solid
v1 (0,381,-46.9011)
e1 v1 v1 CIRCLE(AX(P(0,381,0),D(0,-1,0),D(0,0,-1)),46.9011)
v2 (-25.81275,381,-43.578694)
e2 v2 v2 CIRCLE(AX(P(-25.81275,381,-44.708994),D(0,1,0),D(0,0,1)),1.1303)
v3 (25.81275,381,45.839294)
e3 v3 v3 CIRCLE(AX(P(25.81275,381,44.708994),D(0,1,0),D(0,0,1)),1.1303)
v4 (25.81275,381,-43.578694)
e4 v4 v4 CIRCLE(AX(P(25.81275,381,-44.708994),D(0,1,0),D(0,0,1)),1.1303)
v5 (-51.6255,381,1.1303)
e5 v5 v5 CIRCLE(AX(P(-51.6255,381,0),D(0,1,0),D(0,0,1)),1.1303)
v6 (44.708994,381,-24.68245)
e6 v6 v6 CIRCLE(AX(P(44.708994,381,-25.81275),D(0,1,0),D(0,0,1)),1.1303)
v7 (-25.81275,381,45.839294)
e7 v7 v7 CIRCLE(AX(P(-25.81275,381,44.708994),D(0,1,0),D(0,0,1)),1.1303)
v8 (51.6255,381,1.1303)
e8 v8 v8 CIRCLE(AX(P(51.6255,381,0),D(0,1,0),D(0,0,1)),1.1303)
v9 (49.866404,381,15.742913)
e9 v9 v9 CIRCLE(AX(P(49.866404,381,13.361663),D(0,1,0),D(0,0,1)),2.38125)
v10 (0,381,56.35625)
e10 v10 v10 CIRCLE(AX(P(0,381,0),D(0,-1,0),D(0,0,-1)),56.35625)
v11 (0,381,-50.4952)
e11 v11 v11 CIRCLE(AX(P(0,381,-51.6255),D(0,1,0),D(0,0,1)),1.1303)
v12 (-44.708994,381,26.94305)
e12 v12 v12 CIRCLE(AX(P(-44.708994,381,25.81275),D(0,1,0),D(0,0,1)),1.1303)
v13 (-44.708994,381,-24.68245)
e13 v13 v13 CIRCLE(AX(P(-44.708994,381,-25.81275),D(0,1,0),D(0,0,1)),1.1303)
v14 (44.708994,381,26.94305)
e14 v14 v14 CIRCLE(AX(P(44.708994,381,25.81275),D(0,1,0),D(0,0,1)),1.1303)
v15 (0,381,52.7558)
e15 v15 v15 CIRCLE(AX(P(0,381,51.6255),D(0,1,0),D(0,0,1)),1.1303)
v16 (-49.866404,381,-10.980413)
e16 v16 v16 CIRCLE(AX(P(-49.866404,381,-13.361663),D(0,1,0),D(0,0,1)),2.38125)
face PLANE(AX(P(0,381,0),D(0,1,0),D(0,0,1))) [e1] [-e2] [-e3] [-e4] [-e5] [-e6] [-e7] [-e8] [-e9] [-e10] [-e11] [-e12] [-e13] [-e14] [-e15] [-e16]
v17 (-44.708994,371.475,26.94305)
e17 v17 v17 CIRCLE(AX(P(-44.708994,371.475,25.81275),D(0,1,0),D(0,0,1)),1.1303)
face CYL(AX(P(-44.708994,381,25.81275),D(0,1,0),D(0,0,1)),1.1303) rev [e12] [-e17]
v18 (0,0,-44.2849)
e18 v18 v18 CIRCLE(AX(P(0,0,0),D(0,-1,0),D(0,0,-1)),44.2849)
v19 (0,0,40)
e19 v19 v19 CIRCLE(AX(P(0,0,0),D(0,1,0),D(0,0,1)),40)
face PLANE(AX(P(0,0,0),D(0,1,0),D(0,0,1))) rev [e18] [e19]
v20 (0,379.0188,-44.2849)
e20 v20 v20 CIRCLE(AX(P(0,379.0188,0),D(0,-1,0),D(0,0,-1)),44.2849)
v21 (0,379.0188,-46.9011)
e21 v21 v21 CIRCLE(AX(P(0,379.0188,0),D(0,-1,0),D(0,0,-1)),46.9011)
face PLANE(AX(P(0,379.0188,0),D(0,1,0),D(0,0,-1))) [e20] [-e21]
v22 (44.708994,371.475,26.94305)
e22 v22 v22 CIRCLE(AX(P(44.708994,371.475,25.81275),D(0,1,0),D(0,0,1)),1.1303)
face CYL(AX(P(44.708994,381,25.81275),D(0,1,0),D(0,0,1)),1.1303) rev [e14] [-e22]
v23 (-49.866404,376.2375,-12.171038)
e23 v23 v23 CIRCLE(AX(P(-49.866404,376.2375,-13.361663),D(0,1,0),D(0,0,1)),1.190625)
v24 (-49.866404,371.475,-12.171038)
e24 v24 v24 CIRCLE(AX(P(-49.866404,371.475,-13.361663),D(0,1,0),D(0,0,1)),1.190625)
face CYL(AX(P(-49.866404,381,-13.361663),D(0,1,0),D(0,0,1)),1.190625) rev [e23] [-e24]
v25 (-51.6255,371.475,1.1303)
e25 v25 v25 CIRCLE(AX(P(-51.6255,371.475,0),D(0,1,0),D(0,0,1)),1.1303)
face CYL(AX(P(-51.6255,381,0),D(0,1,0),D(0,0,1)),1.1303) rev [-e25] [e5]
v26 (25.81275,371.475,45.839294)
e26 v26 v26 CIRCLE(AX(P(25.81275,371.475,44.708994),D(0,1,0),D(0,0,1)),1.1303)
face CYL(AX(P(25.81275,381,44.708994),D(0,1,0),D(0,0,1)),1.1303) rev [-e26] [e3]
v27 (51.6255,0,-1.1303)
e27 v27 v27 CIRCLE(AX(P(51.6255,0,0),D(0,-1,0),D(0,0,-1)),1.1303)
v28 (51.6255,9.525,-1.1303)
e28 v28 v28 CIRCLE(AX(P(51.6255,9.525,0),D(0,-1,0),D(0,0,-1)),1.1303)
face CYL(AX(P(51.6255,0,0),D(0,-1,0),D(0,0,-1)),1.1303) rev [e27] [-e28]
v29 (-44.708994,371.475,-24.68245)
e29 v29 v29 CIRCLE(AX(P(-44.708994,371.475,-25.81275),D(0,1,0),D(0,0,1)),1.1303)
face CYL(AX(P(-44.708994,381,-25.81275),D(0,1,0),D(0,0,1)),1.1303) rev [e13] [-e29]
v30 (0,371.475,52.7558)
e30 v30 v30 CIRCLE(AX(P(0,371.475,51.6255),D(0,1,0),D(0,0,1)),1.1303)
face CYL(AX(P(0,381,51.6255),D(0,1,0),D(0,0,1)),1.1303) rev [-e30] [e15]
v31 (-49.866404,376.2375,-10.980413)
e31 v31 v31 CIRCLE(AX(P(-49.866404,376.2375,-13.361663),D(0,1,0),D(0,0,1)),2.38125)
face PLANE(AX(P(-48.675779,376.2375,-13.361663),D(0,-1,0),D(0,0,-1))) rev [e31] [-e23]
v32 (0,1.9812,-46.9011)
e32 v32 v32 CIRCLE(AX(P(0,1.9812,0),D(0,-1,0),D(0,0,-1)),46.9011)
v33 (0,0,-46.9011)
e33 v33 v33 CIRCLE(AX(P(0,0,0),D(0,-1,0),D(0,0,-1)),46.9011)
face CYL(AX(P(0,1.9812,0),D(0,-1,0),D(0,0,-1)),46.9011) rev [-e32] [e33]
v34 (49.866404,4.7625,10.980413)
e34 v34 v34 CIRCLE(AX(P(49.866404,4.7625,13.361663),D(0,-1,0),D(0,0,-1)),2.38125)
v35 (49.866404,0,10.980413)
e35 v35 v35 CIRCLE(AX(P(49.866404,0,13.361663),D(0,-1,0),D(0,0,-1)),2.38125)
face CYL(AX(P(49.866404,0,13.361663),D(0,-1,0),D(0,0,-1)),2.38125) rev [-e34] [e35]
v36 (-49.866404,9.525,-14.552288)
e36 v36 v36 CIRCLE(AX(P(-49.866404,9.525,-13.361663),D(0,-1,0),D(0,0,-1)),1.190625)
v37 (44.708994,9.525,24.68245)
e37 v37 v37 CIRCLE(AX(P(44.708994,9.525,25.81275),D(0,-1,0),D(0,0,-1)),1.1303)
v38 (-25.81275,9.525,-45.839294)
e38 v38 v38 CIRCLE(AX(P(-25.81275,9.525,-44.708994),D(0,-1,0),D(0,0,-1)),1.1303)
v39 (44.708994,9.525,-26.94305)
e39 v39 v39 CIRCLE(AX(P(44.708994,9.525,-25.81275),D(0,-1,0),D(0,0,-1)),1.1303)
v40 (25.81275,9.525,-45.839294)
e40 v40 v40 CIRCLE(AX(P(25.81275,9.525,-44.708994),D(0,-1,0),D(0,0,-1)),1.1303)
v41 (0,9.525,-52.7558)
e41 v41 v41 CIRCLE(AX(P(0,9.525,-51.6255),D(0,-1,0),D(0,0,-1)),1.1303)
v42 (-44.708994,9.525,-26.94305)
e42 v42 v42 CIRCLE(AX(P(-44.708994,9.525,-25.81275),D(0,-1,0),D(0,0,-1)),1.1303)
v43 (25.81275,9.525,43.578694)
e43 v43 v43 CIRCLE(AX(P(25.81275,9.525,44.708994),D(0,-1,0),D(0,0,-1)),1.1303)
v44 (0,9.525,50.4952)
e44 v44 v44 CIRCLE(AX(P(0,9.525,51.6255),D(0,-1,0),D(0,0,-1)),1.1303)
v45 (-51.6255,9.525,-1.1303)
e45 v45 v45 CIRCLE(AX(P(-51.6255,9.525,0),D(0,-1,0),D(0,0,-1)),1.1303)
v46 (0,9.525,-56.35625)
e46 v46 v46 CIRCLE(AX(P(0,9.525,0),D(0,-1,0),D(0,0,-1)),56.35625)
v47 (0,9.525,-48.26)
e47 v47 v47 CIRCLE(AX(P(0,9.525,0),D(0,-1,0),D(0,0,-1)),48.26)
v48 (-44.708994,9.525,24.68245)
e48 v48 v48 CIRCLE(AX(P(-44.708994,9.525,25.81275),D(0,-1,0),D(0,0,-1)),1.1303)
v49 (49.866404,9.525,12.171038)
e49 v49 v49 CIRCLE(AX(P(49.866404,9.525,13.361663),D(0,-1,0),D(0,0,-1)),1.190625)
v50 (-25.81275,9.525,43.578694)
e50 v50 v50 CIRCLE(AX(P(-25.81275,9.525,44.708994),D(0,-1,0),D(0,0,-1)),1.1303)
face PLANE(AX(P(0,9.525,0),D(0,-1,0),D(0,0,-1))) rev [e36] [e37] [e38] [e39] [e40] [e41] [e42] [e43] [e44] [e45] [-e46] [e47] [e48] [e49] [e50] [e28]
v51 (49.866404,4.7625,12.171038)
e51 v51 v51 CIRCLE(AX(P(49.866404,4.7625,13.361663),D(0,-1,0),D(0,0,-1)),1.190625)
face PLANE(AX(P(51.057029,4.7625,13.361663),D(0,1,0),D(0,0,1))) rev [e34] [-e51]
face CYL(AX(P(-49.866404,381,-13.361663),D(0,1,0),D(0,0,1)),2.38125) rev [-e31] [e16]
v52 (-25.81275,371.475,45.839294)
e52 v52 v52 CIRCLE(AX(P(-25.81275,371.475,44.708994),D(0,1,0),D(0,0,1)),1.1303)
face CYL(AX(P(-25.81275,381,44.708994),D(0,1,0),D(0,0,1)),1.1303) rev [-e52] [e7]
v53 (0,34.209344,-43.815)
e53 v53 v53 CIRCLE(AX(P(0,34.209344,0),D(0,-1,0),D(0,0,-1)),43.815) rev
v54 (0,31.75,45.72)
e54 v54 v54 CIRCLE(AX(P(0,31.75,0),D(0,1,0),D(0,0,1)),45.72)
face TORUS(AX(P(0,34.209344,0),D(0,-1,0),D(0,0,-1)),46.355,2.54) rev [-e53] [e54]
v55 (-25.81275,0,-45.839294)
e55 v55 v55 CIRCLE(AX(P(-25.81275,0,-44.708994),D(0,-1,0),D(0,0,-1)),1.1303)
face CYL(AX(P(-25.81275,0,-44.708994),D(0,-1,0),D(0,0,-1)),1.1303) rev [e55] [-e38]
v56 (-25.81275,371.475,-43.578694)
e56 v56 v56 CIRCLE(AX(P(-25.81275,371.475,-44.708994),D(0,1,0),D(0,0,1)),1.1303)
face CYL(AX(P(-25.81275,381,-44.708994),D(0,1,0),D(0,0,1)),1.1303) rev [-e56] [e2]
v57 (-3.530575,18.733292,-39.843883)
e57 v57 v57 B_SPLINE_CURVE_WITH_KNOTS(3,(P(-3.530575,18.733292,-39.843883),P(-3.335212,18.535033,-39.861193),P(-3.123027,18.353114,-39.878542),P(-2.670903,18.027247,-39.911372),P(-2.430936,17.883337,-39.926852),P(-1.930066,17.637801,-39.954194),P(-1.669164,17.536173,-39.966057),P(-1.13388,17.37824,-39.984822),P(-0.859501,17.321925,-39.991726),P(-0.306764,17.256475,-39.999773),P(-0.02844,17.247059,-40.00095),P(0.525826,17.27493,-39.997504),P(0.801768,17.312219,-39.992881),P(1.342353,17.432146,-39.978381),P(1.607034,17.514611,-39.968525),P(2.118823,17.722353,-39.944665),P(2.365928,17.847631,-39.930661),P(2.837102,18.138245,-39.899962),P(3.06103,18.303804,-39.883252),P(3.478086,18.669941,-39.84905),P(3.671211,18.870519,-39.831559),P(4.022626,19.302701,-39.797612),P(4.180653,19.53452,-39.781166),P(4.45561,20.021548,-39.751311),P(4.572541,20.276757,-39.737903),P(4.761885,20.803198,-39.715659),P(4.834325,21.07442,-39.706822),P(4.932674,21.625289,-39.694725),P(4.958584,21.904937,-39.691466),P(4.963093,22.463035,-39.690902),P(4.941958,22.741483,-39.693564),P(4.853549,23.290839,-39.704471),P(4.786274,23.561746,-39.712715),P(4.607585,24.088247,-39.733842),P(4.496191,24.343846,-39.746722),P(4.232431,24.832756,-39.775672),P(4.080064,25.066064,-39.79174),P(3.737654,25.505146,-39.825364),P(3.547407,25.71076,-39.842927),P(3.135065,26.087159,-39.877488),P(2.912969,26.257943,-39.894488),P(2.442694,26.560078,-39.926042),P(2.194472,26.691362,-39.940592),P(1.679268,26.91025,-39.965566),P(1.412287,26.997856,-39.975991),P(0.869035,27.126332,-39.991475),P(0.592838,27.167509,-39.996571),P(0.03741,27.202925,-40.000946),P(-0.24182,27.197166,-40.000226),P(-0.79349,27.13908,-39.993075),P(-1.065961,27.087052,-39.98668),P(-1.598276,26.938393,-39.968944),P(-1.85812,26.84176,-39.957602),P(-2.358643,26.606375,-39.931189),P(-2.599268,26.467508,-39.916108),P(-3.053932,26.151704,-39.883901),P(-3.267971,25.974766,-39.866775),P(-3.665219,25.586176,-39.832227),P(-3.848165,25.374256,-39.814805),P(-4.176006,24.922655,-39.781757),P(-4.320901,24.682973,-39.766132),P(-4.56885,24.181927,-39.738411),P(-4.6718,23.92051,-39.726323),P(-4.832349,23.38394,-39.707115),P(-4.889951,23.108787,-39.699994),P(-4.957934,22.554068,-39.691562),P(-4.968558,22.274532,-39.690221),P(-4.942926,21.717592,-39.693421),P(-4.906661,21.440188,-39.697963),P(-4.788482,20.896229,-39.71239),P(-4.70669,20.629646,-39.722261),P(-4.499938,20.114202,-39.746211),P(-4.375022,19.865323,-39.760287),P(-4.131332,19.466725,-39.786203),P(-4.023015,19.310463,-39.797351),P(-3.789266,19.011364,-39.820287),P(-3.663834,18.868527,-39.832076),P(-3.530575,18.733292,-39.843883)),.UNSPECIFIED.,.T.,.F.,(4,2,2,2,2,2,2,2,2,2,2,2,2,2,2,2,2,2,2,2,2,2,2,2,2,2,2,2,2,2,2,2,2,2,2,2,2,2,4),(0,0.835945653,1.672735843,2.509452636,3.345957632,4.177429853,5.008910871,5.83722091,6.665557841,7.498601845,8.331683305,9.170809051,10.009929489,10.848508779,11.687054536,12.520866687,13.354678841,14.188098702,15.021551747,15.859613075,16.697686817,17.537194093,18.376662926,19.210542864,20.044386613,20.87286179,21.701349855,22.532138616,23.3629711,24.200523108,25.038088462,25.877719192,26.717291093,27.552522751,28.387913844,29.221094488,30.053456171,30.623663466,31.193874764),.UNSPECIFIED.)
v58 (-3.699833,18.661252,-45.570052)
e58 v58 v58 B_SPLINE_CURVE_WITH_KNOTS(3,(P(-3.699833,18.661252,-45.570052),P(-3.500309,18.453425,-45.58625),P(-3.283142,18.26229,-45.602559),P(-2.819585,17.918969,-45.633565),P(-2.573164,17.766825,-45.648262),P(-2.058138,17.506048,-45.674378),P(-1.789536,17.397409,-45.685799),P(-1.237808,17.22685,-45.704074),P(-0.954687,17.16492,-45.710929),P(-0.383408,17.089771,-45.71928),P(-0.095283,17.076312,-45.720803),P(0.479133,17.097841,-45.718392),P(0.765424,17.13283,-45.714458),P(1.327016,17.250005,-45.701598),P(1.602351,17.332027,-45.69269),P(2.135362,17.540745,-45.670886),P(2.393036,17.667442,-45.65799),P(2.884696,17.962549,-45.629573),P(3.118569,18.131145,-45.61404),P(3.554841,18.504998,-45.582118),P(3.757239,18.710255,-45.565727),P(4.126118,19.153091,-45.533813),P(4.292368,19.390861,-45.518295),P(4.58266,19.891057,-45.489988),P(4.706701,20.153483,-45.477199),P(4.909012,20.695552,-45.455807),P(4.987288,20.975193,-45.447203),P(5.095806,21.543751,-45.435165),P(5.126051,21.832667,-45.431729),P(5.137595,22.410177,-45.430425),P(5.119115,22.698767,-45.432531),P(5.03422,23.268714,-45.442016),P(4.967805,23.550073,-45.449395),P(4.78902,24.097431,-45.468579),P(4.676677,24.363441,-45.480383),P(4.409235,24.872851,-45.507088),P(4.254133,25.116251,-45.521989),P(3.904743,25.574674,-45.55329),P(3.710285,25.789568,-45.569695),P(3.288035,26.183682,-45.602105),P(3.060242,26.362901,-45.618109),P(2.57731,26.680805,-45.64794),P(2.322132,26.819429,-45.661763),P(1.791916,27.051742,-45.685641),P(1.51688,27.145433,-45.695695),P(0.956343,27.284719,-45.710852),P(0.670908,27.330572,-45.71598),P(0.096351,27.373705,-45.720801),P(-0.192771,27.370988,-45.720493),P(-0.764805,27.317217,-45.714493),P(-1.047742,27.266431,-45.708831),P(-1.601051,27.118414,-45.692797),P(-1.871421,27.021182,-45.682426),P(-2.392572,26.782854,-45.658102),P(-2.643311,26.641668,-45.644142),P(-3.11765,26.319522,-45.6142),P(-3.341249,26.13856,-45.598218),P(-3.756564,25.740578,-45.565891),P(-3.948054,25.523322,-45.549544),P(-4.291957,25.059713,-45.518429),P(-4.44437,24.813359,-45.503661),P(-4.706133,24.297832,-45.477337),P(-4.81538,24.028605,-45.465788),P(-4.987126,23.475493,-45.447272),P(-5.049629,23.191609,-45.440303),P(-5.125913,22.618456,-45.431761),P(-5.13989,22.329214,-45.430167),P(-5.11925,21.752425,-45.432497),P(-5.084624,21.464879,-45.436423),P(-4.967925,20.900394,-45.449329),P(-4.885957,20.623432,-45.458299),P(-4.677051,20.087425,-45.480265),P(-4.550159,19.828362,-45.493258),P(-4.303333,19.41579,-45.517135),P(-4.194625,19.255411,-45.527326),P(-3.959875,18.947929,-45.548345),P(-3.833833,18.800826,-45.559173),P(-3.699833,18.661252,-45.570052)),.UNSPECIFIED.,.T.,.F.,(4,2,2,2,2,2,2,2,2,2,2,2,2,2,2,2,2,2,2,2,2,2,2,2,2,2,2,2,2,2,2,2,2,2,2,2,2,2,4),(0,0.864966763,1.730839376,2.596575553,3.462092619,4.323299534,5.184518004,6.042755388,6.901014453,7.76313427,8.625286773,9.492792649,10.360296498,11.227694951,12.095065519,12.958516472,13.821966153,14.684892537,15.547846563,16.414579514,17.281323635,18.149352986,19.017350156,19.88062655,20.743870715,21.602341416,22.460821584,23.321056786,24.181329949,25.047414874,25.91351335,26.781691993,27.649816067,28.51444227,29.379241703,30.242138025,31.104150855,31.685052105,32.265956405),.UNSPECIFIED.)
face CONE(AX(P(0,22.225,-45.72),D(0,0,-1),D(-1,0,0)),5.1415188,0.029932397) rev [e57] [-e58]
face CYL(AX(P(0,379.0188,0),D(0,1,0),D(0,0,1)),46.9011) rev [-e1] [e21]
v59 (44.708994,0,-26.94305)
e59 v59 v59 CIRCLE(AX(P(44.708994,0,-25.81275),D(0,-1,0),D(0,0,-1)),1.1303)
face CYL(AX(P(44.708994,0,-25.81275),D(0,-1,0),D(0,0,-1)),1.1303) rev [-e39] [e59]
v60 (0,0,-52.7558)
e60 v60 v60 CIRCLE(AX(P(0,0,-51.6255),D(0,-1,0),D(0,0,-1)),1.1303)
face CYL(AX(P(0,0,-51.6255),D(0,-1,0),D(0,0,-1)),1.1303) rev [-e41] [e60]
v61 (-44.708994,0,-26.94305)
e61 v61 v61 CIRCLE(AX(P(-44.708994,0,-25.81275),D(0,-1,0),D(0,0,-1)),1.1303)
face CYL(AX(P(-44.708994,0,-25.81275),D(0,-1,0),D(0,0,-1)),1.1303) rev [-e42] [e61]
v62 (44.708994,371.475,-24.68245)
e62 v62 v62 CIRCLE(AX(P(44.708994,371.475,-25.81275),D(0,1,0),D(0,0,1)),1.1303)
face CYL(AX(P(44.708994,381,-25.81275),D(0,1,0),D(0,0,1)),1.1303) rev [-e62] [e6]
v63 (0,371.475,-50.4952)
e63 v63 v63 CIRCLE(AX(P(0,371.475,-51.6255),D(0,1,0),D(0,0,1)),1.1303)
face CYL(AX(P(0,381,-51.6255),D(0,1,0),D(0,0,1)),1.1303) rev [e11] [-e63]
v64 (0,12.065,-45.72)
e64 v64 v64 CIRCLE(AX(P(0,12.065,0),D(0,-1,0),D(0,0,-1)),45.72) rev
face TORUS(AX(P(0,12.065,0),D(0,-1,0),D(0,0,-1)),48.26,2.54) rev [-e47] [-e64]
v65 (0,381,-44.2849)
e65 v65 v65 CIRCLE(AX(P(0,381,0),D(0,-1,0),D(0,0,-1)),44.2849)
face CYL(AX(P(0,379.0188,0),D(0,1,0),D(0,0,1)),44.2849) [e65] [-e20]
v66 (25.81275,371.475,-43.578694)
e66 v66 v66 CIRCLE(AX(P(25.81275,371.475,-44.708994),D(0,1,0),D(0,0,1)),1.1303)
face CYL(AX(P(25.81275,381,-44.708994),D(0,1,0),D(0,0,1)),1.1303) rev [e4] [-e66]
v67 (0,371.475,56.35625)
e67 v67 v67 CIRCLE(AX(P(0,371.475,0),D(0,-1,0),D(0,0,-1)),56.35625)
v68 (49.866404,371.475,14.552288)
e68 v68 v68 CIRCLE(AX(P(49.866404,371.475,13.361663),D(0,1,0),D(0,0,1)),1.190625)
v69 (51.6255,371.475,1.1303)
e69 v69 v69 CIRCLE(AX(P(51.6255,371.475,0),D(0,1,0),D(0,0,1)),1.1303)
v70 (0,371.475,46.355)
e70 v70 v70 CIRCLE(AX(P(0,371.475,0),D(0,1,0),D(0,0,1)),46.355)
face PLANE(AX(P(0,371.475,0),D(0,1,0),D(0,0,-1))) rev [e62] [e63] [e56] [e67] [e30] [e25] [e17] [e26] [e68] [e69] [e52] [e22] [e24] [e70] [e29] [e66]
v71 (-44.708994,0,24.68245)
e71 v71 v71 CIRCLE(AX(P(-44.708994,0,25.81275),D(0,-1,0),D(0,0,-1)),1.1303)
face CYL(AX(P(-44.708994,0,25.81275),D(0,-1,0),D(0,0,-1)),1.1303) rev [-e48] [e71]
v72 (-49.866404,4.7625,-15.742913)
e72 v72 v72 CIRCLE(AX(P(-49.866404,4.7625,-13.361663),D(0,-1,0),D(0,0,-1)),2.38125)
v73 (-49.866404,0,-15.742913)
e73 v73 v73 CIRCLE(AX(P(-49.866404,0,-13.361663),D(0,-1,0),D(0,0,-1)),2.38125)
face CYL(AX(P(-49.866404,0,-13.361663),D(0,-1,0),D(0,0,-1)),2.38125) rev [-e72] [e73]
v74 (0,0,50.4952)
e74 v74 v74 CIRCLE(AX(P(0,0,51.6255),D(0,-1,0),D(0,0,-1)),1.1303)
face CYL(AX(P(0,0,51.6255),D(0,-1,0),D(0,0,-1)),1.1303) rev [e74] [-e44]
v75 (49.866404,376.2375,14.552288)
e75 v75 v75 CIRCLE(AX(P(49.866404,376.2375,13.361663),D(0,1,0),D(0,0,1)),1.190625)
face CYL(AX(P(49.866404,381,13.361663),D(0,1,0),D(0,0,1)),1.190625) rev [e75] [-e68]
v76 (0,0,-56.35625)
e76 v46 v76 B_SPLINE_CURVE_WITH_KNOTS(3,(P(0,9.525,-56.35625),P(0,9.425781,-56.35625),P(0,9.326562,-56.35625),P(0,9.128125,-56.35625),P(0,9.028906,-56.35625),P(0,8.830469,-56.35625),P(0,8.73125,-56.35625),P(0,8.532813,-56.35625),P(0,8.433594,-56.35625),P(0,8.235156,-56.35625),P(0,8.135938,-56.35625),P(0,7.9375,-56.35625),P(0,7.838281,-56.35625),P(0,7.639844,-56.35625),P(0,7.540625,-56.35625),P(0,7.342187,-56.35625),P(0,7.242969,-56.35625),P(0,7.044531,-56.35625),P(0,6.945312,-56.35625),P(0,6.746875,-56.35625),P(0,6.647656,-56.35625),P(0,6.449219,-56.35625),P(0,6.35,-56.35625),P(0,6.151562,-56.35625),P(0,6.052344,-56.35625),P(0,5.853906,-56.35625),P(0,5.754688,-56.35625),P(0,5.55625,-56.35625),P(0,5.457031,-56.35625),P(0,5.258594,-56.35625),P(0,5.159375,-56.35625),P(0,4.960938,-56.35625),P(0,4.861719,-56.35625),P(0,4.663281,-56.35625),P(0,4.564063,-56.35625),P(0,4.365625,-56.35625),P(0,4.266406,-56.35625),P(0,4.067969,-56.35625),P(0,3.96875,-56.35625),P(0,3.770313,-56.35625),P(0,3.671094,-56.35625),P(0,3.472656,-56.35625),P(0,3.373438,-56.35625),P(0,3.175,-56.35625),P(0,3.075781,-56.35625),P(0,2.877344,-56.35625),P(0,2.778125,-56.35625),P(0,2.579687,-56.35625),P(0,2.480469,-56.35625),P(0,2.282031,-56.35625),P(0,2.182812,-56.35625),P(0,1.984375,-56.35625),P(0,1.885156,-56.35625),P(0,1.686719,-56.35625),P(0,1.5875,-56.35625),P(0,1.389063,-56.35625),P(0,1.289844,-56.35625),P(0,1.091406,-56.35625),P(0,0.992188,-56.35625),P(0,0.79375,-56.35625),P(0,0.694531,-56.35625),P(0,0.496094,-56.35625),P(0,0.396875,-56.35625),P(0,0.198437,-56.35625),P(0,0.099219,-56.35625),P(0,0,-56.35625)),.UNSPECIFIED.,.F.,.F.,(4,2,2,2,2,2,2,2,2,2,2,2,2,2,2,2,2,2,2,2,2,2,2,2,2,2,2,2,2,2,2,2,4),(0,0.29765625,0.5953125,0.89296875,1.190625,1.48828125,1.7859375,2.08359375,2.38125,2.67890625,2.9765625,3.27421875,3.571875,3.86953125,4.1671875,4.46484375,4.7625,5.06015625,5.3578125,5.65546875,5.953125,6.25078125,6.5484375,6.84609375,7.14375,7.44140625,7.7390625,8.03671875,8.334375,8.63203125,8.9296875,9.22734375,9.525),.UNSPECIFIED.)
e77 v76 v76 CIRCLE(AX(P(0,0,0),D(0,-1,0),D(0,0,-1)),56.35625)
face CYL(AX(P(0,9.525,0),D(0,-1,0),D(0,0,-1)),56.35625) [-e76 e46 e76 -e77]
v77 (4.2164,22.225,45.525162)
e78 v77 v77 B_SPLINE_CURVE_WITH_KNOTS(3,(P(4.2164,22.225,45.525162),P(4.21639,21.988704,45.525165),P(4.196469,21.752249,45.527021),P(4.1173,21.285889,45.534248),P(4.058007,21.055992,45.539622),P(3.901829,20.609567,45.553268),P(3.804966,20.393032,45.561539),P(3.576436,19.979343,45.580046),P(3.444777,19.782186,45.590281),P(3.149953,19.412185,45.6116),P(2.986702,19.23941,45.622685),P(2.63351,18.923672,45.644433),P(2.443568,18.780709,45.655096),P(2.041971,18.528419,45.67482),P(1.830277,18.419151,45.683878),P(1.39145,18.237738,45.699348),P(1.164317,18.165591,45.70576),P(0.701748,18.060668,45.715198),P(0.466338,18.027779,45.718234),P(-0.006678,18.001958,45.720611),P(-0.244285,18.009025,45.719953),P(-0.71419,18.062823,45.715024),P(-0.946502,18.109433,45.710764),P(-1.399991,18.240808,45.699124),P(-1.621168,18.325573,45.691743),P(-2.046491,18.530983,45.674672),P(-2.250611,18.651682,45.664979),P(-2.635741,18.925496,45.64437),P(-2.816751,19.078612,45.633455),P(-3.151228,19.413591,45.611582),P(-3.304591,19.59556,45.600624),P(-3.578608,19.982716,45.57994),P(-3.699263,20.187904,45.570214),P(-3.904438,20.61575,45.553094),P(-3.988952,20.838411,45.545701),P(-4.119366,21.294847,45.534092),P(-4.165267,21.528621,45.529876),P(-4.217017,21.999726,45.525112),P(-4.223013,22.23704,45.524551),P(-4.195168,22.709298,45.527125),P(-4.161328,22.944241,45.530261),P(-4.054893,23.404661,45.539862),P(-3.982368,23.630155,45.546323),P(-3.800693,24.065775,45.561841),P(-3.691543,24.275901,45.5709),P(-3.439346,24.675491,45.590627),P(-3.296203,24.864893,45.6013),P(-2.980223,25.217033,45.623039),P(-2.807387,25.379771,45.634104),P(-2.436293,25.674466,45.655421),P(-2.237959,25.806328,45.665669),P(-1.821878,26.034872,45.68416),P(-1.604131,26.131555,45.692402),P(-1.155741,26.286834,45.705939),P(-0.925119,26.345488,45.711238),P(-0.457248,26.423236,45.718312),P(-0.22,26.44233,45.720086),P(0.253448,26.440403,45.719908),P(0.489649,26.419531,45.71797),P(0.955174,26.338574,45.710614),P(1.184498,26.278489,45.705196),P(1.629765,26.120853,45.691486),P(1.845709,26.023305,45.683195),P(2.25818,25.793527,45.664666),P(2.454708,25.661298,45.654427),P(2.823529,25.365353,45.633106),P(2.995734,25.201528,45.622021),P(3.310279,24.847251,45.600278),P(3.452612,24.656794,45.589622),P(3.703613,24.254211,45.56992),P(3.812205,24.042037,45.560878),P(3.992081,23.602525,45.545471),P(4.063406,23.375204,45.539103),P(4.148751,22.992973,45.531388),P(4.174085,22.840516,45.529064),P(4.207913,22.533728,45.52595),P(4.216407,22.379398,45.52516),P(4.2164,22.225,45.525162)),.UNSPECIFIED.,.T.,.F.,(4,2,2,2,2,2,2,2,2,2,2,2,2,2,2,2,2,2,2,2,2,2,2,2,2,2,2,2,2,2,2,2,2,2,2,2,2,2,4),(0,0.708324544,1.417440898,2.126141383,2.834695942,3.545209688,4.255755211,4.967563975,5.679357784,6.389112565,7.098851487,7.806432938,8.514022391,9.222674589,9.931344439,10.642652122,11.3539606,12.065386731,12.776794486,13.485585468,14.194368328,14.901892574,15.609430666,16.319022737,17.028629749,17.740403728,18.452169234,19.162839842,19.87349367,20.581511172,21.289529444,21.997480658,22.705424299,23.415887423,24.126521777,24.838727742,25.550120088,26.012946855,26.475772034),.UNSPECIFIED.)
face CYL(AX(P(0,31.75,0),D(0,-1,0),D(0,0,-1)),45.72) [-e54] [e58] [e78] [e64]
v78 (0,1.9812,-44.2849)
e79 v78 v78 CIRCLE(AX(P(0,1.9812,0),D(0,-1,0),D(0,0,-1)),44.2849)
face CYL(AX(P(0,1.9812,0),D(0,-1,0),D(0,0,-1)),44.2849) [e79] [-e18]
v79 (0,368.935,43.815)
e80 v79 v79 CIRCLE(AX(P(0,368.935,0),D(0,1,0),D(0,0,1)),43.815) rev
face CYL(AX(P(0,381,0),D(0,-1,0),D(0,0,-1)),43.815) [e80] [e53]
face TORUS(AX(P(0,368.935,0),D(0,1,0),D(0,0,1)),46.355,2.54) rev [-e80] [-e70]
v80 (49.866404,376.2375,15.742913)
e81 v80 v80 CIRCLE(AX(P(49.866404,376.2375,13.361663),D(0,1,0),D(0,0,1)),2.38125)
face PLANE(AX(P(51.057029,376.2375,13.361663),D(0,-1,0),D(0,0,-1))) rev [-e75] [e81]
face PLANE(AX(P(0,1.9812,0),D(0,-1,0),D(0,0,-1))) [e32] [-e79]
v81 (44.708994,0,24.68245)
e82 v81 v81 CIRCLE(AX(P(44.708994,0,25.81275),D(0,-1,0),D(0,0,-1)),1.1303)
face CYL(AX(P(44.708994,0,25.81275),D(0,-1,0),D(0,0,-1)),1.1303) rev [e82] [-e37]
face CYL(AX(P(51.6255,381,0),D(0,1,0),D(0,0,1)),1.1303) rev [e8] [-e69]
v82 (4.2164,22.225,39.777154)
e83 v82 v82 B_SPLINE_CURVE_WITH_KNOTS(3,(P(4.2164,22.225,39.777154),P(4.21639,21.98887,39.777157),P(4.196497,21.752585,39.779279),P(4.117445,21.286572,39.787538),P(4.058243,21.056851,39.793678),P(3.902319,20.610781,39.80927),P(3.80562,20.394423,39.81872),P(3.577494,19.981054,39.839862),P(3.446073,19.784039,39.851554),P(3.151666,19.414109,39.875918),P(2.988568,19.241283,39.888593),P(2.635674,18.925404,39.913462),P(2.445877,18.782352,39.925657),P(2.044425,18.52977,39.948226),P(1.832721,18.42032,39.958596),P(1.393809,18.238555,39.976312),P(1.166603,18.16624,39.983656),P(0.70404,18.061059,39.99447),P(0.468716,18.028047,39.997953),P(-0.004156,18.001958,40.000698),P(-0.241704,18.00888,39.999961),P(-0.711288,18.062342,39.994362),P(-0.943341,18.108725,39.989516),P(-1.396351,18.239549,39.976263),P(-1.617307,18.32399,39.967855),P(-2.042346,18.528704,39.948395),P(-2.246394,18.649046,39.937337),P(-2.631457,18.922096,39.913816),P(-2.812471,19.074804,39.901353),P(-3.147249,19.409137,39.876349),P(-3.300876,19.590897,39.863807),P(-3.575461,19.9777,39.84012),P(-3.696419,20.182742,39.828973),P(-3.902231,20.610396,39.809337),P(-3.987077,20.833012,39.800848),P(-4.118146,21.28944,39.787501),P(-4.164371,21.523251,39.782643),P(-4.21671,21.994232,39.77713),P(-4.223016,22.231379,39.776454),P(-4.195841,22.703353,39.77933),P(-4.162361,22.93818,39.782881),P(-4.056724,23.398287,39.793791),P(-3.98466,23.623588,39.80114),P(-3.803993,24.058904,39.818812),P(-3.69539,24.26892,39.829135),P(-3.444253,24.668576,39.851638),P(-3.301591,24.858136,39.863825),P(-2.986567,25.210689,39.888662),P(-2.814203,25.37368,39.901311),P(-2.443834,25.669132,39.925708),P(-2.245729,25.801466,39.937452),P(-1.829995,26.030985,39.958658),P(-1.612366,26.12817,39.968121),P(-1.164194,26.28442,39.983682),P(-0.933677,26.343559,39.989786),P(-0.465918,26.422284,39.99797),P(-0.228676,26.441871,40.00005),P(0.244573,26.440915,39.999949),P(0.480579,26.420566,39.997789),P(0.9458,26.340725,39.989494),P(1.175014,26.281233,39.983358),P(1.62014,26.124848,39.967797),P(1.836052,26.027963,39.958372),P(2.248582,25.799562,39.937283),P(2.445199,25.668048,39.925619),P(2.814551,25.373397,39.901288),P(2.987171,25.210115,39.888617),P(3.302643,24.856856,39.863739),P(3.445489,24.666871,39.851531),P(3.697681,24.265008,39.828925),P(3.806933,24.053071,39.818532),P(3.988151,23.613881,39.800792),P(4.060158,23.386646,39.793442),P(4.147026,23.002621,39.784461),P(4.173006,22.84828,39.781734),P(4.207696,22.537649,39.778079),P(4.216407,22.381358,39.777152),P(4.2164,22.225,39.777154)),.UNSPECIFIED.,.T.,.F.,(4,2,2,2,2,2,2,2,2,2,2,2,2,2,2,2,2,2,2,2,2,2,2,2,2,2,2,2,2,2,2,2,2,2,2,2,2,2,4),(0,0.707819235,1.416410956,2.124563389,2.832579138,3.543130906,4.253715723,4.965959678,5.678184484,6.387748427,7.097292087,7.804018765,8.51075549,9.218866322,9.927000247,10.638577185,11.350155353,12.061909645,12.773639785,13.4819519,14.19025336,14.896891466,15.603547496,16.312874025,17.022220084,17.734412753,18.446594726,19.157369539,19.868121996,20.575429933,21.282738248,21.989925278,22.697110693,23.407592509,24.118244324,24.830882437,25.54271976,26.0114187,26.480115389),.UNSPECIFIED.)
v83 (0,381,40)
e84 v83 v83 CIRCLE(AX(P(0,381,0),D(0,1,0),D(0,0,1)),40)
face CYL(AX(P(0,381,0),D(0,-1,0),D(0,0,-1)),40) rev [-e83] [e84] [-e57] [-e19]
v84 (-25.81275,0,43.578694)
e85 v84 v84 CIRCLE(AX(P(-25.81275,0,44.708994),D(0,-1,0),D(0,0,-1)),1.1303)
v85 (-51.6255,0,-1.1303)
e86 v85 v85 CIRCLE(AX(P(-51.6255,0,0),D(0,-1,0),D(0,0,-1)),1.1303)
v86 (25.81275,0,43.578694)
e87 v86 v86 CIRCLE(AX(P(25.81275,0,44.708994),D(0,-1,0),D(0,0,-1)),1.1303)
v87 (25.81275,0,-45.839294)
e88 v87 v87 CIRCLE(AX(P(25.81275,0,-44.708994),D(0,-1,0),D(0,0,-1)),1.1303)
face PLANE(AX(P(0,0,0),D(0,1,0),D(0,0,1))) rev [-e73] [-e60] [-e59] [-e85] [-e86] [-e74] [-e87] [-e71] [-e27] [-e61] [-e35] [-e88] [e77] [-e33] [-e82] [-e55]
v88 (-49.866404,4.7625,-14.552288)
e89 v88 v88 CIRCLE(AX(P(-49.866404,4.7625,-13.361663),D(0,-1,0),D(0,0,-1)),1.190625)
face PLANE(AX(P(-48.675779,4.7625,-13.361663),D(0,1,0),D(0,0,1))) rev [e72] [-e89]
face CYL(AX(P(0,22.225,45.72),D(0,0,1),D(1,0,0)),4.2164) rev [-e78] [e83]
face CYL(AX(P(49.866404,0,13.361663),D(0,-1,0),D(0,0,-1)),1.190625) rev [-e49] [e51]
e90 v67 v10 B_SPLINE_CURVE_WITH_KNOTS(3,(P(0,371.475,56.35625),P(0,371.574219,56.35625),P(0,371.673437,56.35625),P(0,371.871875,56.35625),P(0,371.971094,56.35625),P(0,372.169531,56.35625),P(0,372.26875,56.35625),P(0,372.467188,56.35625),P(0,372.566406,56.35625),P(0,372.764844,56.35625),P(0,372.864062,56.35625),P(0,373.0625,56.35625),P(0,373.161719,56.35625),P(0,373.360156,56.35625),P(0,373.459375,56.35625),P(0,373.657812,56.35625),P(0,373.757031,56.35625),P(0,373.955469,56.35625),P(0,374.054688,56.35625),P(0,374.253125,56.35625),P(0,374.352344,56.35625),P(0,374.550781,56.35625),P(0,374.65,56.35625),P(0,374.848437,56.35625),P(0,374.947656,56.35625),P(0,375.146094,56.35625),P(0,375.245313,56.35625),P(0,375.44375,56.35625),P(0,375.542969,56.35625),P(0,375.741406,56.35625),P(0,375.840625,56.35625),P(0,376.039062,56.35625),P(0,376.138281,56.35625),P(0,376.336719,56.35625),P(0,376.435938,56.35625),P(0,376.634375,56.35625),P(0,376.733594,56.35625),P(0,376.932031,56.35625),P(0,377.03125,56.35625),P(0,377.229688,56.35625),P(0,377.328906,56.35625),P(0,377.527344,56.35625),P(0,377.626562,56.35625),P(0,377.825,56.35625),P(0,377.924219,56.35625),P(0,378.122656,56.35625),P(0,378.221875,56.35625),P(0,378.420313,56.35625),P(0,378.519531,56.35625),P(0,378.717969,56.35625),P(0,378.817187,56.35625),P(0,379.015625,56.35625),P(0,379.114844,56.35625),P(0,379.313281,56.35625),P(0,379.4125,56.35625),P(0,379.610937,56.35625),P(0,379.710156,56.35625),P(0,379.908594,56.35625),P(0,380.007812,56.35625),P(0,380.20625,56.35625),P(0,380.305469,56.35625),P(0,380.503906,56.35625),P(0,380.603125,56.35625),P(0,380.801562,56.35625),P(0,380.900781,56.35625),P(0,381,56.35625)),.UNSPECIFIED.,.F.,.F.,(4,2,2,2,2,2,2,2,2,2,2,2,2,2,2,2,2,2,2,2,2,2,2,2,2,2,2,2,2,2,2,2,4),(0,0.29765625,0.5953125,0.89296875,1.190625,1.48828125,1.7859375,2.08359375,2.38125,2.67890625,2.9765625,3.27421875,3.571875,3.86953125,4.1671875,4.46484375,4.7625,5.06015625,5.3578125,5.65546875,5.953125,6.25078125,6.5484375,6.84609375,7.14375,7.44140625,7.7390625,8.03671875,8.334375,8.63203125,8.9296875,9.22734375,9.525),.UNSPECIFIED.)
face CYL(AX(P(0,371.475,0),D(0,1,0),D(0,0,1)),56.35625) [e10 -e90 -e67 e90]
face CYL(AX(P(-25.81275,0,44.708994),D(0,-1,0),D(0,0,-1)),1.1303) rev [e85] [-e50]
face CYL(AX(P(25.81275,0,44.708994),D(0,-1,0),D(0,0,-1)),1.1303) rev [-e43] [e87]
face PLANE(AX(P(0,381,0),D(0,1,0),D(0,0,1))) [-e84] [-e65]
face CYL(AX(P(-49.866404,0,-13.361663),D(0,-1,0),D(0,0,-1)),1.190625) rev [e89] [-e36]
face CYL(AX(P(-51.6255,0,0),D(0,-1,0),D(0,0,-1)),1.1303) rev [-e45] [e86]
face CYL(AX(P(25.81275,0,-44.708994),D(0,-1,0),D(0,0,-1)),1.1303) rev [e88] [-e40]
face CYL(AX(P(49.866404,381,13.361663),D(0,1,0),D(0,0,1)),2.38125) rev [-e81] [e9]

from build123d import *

# Parameters (mm, degrees)
SKETCH2_R               = 43.815
SKETCH2_R_2             = 40
BASE_CYLINDER_DEPTH     = 381
SKETCH3_R               = 56.35625
SKETCH3_R_2             = 40
AFT_FLANGE_DEPTH        = 9.525
SKETCH6_R               = 46.9011
SKETCH6_R_2             = 44.2849
AFT_O_RING_DEPTH        = 1.9812
SKETCH33_R              = 45.72
SKETCH33_R_2            = 43.815
CRITICALBOSS_DEPTH      = 22.225
FILLET1_R               = 2.54
BOLT_CIRCLE_D           = 2.2606
BOLT_CIRCLE_DEPTH       = 381
HOLE1_D                 = 2.38125
HOLE1_DEPTH             = 381
HOLE1_CBORE_D           = 4.7625
HOLE1_CBORE_DEPTH       = 4.7625
F_3_8_24_TAPPED_HOLE1_D = 8.4328
FILLET2_R               = 2.54


with BuildPart() as part:
    # Sketch2 → Base Cylinder (new body)
    with BuildSketch(Plane(origin=(0, 0, 0), x_dir=(1, 0, 0), z_dir=(0, 1, 0))):
        with Locations(Location((0, 0, 0), (0, 0, 270))):
            Circle(SKETCH2_R)
        with Locations(Location((0, 0, 0), (0, 0, 270))):
            Circle(SKETCH2_R_2, mode=Mode.SUBTRACT)
    extrude(amount=BASE_CYLINDER_DEPTH)

    # Sketch3 → Aft Flange (add)
    with BuildSketch(Plane.XZ):
        with Locations(Location((0, 0, 0), (0, 0, 270))):
            Circle(SKETCH3_R)
        with Locations(Location((0, 0, 0), (0, 0, 90))):
            Circle(SKETCH3_R_2, mode=Mode.SUBTRACT)
    aft_flange = extrude(amount=-AFT_FLANGE_DEPTH)

    # Sketch6 → Aft O-Ring (cut)
    with BuildSketch(Plane.XZ):
        with Locations(Location((0, 0, 0), (0, 0, 270))):
            Circle(SKETCH6_R)
        with Locations(Location((0, 0, 0), (0, 0, 270))):
            Circle(SKETCH6_R_2, mode=Mode.SUBTRACT)
    aft_o_ring = extrude(amount=-AFT_O_RING_DEPTH, mode=Mode.SUBTRACT)

    # Sketch33 → CriticalBoss (add)
    with BuildSketch(Plane(origin=(0, 9.525, 0), x_dir=(1, 0, 0), z_dir=(0, 1, 0))):
        with Locations(Location((0, 0, 0), (0, 0, 90))):
            Circle(SKETCH33_R)
        with Locations(Location((0, 0, 0), (0, 0, 270))):
            Circle(SKETCH33_R_2, mode=Mode.SUBTRACT)
    extrude(amount=CRITICALBOSS_DEPTH)

    # Fillet1
    # the kernel refuses this fillet: 2.54 mm, written as the material it adds along each edge
    with BuildSketch(Plane(origin=(0, 9.525, 0), x_dir=(0, 0, -1), z_dir=(1, 0, 0))) as fillet1_piece_1:
        with BuildLine():
            CenterArc((45.72 + FILLET1_R, FILLET1_R), FILLET1_R, 180, 90)
            Line((45.72, FILLET1_R), (45.72 - FILLET1_R * 0.02, FILLET1_R))
            Line((45.72 - FILLET1_R * 0.02, FILLET1_R), (45.72 - FILLET1_R * 0.02, -FILLET1_R * 0.02))
            Line((45.72 - FILLET1_R * 0.02, -FILLET1_R * 0.02), (45.72 + FILLET1_R, -FILLET1_R * 0.02))
            Line((45.72 + FILLET1_R, -FILLET1_R * 0.02), (45.72 + FILLET1_R, 0))
        make_face()
    revolve(axis=Axis((0, 9.525, 0), (0, 1, 0)))
    with BuildSketch(Plane(origin=(0, 31.75, 0), x_dir=(0, 0, 1), z_dir=(-1, 0, 0))) as fillet1_piece_2:
        with BuildLine():
            CenterArc((46.355, 2.459344425), FILLET1_R, 180, 75.522487814)
            Line((43.815, 2.459344425), (43.7642, 2.459344425))
            Line((43.7642, 2.459344425), (43.7642, 0))
            Line((43.7642, 0), (43.815, -0.0508))
            ThreePointArc((43.815, -0.0508), (44.7675, -0.0508), (45.7073, -0.049186888))
            Line((45.7073, -0.049186888), (45.72, 0))
        make_face()
    revolve(axis=Axis((0, 31.75, 0), (0, 1, 0)))

    # Bolt Circle
    with Locations(Plane(origin=(0, 0, 0), x_dir=(-1, 0, 0), z_dir=(0, -1, 0))):
        with Locations((-25.81275, -44.708994483), (-44.708994483, -25.81275), (-51.6255, 0), (-44.708994483, 25.81275), (-25.81275, 44.708994483), (0, 51.6255), (25.81275, 44.708994483), (44.708994483, 25.81275), (51.6255, 0), (44.708994483, -25.81275), (25.81275, -44.708994483), (0, -51.6255)):
            bolt_circle = Hole(BOLT_CIRCLE_D / 2, depth=BOLT_CIRCLE_DEPTH)

    # Hole1
    with Locations(Plane(origin=(0, 0, 0), x_dir=(-1, 0, 0), z_dir=(0, -1, 0))):
        with Locations((49.866403745, 13.361662613), (-49.866403745, -13.361662613)):
            hole1 = CounterBoreHole(HOLE1_D / 2, HOLE1_CBORE_D / 2, HOLE1_CBORE_DEPTH, depth=HOLE1_DEPTH)

    # Sketch44 → 1/8 NPT Tapped ThermocoupleHole (revolve, cut)
    with BuildSketch(Plane(origin=(0, 22.225, -45.72), x_dir=(0, 1, 0), z_dir=(1, 0, 0))):
        Polygon((0, 0), (0, 14.217468714), (4.2164, 11.684), (4.2164, 6.858), (4.936181096, 6.858), (5.1415188, 0), align=None)
    revolve(axis=Axis((0, 22.225, -52.07), (0, 0, 1)), mode=Mode.SUBTRACT)

    # 3/8-24 Tapped Hole1 (through all)
    with Locations(Plane.XY.offset(45.72)):
        with Locations((0, 22.225)):
            Hole(F_3_8_24_TAPPED_HOLE1_D / 2)

    # Mirror1: Aft Flange, Aft O-Ring, Bolt Circle, Hole1 across plane
    add(aft_flange.mirror(Plane.ZX.offset(190.5)))
    add(aft_o_ring.mirror(Plane.ZX.offset(190.5)), mode=Mode.SUBTRACT)
    add(bolt_circle.mirror(Plane.ZX.offset(190.5)), mode=Mode.SUBTRACT)
    add(hole1.mirror(Plane.ZX.offset(190.5)), mode=Mode.SUBTRACT)

    # Fillet2
    fillet2_edges = [part.edges().sort_by_distance(p)[0] for p in [
        (0, 371.475, -43.815),
    ]]
    fillet(fillet2_edges, radius=FILLET2_R)


solid = part.part
